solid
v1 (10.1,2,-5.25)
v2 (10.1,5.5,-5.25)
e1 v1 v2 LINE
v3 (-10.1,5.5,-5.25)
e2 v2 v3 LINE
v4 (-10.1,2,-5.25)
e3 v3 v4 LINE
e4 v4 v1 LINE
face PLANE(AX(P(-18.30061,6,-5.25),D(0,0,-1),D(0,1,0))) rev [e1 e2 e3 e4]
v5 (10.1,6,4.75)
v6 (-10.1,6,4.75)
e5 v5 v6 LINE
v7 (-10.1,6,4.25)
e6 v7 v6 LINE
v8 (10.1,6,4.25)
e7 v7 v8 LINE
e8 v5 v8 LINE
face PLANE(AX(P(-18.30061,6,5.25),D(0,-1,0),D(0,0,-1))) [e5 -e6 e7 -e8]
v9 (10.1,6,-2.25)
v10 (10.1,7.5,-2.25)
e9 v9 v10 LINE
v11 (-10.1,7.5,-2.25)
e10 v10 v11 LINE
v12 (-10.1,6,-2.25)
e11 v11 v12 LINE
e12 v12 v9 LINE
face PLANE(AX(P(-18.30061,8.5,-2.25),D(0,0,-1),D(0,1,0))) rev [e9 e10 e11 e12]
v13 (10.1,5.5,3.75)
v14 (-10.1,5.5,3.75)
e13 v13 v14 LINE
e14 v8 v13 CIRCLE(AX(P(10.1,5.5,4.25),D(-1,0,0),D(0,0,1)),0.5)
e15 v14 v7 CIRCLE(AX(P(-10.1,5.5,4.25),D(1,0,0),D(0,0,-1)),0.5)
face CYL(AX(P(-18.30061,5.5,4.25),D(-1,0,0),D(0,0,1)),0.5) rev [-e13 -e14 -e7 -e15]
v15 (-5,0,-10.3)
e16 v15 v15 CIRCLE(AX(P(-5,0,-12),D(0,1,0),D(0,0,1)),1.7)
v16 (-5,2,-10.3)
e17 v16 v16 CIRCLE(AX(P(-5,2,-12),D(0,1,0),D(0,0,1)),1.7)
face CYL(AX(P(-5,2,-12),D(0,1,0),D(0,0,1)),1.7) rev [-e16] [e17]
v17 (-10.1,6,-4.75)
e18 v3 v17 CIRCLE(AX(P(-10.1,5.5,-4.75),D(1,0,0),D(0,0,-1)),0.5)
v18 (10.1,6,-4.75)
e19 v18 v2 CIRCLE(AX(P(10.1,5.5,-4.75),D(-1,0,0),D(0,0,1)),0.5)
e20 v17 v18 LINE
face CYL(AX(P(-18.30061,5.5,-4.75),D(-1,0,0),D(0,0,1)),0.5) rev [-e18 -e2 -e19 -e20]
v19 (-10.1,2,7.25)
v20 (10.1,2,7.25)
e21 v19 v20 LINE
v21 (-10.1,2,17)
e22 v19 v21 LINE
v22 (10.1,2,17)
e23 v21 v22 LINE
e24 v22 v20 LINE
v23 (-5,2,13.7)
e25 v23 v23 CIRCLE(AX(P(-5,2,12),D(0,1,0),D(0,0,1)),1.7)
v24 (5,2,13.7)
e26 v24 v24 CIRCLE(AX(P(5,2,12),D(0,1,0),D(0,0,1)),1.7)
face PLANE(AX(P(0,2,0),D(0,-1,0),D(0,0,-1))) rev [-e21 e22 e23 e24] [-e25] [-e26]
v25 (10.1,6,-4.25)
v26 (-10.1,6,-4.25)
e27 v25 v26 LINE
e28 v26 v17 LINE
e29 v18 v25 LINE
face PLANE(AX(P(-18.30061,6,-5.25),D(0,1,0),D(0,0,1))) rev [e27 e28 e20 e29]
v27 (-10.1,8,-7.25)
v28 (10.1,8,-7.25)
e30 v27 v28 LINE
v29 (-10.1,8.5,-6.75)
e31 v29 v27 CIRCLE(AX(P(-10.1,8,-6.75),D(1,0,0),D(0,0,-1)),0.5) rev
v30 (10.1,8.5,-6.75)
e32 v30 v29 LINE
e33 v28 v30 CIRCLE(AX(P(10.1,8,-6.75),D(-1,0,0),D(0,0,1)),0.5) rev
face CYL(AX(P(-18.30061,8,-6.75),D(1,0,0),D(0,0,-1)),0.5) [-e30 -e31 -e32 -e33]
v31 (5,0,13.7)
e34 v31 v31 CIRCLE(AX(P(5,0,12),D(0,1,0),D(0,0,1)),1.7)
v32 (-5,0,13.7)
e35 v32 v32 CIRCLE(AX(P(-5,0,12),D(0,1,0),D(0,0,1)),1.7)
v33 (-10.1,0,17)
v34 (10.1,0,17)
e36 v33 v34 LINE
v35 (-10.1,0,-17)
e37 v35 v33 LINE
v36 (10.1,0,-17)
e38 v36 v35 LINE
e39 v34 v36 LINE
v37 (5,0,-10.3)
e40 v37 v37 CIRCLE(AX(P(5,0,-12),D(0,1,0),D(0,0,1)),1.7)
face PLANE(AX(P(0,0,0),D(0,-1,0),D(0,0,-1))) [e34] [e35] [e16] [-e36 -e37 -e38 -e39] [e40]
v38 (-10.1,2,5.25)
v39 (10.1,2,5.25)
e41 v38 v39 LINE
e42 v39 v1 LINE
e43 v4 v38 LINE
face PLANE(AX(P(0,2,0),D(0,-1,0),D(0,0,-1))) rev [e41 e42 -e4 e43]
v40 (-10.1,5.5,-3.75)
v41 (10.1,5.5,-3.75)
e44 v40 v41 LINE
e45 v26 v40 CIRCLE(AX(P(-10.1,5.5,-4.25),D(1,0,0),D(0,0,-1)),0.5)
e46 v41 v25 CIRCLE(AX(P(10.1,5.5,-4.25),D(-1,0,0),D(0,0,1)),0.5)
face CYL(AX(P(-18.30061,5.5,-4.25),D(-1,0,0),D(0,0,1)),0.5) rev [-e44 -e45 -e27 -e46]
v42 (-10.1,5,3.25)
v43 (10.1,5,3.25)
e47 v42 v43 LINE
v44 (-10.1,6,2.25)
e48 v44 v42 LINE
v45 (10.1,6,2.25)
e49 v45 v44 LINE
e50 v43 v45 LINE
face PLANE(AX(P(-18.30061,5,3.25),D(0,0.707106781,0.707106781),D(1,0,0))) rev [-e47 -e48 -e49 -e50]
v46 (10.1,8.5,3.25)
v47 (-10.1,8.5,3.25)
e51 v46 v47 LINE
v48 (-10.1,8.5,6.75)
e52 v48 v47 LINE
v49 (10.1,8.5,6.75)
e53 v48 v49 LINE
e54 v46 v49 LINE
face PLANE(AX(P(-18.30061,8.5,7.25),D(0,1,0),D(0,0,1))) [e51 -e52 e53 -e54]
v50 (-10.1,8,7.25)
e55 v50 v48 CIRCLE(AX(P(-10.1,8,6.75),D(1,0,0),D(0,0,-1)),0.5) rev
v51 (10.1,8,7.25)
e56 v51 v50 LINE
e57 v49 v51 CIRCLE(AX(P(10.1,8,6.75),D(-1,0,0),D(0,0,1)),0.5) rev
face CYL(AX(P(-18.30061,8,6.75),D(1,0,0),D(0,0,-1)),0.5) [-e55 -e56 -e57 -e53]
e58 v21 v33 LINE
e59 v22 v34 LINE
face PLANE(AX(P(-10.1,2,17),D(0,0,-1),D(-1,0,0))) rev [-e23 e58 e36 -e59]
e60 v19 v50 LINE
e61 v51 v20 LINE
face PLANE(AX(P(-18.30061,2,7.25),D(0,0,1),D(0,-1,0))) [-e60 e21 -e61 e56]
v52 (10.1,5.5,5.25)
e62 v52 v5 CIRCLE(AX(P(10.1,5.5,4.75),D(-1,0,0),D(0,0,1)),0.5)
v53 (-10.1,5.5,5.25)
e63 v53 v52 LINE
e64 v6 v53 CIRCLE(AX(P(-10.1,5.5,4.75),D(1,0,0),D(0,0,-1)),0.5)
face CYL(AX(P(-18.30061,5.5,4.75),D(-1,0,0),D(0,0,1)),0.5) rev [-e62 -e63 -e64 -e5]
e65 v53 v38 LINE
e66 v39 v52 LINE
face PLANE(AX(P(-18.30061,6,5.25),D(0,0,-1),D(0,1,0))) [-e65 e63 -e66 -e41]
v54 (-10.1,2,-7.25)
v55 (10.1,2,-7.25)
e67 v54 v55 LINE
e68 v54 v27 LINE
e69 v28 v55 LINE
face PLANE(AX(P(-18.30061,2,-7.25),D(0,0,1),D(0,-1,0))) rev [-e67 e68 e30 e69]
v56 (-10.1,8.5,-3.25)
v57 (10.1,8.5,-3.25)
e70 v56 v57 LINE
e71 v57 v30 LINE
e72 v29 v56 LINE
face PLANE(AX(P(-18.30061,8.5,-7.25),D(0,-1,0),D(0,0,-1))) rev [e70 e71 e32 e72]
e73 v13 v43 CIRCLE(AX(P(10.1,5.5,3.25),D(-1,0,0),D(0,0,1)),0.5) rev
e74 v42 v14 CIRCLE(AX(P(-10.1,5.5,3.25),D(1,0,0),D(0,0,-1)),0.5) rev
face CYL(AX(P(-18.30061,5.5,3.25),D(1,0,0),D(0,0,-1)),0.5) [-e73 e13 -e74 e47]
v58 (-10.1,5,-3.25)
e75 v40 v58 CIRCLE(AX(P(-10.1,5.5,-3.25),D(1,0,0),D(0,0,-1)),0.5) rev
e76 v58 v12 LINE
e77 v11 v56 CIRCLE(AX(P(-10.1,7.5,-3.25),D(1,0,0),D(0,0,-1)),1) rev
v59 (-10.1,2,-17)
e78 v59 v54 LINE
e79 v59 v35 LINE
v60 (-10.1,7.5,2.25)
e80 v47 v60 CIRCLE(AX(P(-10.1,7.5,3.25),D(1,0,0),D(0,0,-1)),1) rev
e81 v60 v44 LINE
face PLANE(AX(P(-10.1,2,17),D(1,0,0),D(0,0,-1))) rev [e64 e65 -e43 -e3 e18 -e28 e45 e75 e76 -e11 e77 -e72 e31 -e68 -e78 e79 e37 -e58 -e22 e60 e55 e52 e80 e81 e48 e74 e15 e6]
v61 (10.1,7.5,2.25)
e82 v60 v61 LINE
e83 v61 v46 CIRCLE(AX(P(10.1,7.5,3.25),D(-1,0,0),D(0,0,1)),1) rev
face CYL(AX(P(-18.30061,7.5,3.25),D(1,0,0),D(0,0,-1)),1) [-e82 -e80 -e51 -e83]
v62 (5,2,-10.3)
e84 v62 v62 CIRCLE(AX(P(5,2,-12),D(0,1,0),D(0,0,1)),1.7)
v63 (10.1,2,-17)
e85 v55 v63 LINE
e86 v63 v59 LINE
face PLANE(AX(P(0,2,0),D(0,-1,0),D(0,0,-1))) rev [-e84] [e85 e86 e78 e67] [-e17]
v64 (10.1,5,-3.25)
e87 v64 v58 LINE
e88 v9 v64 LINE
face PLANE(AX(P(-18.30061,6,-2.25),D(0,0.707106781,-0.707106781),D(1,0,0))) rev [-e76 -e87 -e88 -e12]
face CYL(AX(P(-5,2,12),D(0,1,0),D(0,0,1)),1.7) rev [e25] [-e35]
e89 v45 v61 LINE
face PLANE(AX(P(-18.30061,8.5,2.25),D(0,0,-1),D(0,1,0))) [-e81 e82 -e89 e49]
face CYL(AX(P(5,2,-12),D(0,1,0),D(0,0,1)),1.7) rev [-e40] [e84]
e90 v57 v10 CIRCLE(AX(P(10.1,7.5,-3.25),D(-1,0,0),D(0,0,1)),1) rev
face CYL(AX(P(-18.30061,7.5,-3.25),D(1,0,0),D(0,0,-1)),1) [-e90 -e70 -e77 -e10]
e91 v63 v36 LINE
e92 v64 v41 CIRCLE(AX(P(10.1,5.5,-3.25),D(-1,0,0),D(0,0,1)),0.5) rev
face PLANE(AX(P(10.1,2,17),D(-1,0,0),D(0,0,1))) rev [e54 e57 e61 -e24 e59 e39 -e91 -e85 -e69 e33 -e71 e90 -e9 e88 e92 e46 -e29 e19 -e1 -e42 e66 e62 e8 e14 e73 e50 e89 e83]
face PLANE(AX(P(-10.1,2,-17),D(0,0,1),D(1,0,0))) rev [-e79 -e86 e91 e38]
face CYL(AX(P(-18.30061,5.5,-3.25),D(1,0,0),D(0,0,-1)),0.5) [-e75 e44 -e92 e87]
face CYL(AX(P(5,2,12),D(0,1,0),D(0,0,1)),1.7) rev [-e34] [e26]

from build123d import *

# Parameters (mm, degrees)
SCHIZZO1_W                   = 20.2
SCHIZZO1_H                   = 34
ESTRUSIONE_ESTRUSIONE1_DEPTH = 2
ESTRUSIONE_ESTRUSIONE2_DEPTH = 20.2
SMUSSO1_SIZE                 = 1
RACCORDO2_R                  = 0.5
RACCORDO3_R                  = 1
FORO_PER_VITE_M3_1_D         = 3.4
SMUSSO1_OF_SPECCHIA2_SIZE    = 1
RACCORDO2_OF_SPECCHIA2_R     = 0.5
RACCORDO3_OF_SPECCHIA2_R     = 1


with BuildPart() as part:
    # Schizzo1 → Estrusione-Estrusione1 (new body)
    with BuildSketch(Plane(origin=(0, 0, 0), x_dir=(1, 0, 0), z_dir=(0, 1, 0))):
        Rectangle(SCHIZZO1_W, SCHIZZO1_H)
    extrude(amount=ESTRUSIONE_ESTRUSIONE1_DEPTH)

    # Schizzo3 → Estrusione-Estrusione2 (add)
    with BuildSketch(Plane(origin=(10.1, 0, 0), x_dir=(0, 0, -1), z_dir=(1, 0, 0))):
        Polygon((-7.25, 2), (-5.25, 2), (-5.25, 6), (-3.75, 6), (-3.75, 5), (-2.25, 5), (-2.25, 8.5), (-7.25, 8.5), align=None)
    estrusione_estrusione2 = extrude(amount=-ESTRUSIONE_ESTRUSIONE2_DEPTH)

    # Smusso1
    smusso1_edges = [part.edges().sort_by_distance(p)[0] for p in [
        (0, 5, 2.25),
    ]]
    chamfer(smusso1_edges, length=SMUSSO1_SIZE)

    # Raccordo2
    raccordo2_edges = [part.edges().sort_by_distance(p)[0] for p in [
        (0, 6, 5.25),
        (0, 6, 3.75),
    ]]
    fillet(raccordo2_edges, radius=RACCORDO2_R)
    raccordo2_2_edges = [part.edges().sort_by_distance(p)[0] for p in [
        (0, 8.5, 7.25),
        (0, 5, 3.75),
    ]]
    fillet(raccordo2_2_edges, radius=RACCORDO2_R - 0.0001)  # a hair under: the kernel refuses the full size

    # Raccordo3
    raccordo3_edges = [part.edges().sort_by_distance(p)[0] for p in [
        (0, 8.5, 2.25),
    ]]
    fillet(raccordo3_edges, radius=RACCORDO3_R)

    # Foro per Vite M3-1 (through all)
    with Locations(Plane(origin=(0, 2, 0), x_dir=(1, 0, 0), z_dir=(0, 1, 0))):
        with Locations((-5, -12), (5, -12)):
            foro_per_vite_m3_1 = Hole(FORO_PER_VITE_M3_1_D / 2)

    # Specchia2: Estrusione-Estrusione2, Foro per Vite M3-1 across plane
    add(estrusione_estrusione2.mirror(Plane.XY))
    add(foro_per_vite_m3_1.mirror(Plane.XY), mode=Mode.SUBTRACT)

    # Smusso1 of Specchia2
    smusso1_of_specchia2_edges = [part.edges().sort_by_distance(p)[0] for p in [
        (0, 5, -2.25),
    ]]
    chamfer(smusso1_of_specchia2_edges, length=SMUSSO1_OF_SPECCHIA2_SIZE)

    # Raccordo2 of Specchia2
    raccordo2_of_specchia2_edges = [part.edges().sort_by_distance(p)[0] for p in [
        (0, 6, -5.25),
        (0, 6, -3.75),
    ]]
    fillet(raccordo2_of_specchia2_edges, radius=RACCORDO2_OF_SPECCHIA2_R)
    raccordo2_of_specchia2_2_edges = [part.edges().sort_by_distance(p)[0] for p in [
        (0, 8.5, -7.25),
        (0, 5, -3.75),
    ]]
    fillet(raccordo2_of_specchia2_2_edges, radius=RACCORDO2_OF_SPECCHIA2_R - 0.0001)  # a hair under: the kernel refuses the full size

    # Raccordo3 of Specchia2
    raccordo3_of_specchia2_edges = [part.edges().sort_by_distance(p)[0] for p in [
        (0, 8.5, -2.25),
    ]]
    fillet(raccordo3_of_specchia2_edges, radius=RACCORDO3_OF_SPECCHIA2_R)


solid = part.part
